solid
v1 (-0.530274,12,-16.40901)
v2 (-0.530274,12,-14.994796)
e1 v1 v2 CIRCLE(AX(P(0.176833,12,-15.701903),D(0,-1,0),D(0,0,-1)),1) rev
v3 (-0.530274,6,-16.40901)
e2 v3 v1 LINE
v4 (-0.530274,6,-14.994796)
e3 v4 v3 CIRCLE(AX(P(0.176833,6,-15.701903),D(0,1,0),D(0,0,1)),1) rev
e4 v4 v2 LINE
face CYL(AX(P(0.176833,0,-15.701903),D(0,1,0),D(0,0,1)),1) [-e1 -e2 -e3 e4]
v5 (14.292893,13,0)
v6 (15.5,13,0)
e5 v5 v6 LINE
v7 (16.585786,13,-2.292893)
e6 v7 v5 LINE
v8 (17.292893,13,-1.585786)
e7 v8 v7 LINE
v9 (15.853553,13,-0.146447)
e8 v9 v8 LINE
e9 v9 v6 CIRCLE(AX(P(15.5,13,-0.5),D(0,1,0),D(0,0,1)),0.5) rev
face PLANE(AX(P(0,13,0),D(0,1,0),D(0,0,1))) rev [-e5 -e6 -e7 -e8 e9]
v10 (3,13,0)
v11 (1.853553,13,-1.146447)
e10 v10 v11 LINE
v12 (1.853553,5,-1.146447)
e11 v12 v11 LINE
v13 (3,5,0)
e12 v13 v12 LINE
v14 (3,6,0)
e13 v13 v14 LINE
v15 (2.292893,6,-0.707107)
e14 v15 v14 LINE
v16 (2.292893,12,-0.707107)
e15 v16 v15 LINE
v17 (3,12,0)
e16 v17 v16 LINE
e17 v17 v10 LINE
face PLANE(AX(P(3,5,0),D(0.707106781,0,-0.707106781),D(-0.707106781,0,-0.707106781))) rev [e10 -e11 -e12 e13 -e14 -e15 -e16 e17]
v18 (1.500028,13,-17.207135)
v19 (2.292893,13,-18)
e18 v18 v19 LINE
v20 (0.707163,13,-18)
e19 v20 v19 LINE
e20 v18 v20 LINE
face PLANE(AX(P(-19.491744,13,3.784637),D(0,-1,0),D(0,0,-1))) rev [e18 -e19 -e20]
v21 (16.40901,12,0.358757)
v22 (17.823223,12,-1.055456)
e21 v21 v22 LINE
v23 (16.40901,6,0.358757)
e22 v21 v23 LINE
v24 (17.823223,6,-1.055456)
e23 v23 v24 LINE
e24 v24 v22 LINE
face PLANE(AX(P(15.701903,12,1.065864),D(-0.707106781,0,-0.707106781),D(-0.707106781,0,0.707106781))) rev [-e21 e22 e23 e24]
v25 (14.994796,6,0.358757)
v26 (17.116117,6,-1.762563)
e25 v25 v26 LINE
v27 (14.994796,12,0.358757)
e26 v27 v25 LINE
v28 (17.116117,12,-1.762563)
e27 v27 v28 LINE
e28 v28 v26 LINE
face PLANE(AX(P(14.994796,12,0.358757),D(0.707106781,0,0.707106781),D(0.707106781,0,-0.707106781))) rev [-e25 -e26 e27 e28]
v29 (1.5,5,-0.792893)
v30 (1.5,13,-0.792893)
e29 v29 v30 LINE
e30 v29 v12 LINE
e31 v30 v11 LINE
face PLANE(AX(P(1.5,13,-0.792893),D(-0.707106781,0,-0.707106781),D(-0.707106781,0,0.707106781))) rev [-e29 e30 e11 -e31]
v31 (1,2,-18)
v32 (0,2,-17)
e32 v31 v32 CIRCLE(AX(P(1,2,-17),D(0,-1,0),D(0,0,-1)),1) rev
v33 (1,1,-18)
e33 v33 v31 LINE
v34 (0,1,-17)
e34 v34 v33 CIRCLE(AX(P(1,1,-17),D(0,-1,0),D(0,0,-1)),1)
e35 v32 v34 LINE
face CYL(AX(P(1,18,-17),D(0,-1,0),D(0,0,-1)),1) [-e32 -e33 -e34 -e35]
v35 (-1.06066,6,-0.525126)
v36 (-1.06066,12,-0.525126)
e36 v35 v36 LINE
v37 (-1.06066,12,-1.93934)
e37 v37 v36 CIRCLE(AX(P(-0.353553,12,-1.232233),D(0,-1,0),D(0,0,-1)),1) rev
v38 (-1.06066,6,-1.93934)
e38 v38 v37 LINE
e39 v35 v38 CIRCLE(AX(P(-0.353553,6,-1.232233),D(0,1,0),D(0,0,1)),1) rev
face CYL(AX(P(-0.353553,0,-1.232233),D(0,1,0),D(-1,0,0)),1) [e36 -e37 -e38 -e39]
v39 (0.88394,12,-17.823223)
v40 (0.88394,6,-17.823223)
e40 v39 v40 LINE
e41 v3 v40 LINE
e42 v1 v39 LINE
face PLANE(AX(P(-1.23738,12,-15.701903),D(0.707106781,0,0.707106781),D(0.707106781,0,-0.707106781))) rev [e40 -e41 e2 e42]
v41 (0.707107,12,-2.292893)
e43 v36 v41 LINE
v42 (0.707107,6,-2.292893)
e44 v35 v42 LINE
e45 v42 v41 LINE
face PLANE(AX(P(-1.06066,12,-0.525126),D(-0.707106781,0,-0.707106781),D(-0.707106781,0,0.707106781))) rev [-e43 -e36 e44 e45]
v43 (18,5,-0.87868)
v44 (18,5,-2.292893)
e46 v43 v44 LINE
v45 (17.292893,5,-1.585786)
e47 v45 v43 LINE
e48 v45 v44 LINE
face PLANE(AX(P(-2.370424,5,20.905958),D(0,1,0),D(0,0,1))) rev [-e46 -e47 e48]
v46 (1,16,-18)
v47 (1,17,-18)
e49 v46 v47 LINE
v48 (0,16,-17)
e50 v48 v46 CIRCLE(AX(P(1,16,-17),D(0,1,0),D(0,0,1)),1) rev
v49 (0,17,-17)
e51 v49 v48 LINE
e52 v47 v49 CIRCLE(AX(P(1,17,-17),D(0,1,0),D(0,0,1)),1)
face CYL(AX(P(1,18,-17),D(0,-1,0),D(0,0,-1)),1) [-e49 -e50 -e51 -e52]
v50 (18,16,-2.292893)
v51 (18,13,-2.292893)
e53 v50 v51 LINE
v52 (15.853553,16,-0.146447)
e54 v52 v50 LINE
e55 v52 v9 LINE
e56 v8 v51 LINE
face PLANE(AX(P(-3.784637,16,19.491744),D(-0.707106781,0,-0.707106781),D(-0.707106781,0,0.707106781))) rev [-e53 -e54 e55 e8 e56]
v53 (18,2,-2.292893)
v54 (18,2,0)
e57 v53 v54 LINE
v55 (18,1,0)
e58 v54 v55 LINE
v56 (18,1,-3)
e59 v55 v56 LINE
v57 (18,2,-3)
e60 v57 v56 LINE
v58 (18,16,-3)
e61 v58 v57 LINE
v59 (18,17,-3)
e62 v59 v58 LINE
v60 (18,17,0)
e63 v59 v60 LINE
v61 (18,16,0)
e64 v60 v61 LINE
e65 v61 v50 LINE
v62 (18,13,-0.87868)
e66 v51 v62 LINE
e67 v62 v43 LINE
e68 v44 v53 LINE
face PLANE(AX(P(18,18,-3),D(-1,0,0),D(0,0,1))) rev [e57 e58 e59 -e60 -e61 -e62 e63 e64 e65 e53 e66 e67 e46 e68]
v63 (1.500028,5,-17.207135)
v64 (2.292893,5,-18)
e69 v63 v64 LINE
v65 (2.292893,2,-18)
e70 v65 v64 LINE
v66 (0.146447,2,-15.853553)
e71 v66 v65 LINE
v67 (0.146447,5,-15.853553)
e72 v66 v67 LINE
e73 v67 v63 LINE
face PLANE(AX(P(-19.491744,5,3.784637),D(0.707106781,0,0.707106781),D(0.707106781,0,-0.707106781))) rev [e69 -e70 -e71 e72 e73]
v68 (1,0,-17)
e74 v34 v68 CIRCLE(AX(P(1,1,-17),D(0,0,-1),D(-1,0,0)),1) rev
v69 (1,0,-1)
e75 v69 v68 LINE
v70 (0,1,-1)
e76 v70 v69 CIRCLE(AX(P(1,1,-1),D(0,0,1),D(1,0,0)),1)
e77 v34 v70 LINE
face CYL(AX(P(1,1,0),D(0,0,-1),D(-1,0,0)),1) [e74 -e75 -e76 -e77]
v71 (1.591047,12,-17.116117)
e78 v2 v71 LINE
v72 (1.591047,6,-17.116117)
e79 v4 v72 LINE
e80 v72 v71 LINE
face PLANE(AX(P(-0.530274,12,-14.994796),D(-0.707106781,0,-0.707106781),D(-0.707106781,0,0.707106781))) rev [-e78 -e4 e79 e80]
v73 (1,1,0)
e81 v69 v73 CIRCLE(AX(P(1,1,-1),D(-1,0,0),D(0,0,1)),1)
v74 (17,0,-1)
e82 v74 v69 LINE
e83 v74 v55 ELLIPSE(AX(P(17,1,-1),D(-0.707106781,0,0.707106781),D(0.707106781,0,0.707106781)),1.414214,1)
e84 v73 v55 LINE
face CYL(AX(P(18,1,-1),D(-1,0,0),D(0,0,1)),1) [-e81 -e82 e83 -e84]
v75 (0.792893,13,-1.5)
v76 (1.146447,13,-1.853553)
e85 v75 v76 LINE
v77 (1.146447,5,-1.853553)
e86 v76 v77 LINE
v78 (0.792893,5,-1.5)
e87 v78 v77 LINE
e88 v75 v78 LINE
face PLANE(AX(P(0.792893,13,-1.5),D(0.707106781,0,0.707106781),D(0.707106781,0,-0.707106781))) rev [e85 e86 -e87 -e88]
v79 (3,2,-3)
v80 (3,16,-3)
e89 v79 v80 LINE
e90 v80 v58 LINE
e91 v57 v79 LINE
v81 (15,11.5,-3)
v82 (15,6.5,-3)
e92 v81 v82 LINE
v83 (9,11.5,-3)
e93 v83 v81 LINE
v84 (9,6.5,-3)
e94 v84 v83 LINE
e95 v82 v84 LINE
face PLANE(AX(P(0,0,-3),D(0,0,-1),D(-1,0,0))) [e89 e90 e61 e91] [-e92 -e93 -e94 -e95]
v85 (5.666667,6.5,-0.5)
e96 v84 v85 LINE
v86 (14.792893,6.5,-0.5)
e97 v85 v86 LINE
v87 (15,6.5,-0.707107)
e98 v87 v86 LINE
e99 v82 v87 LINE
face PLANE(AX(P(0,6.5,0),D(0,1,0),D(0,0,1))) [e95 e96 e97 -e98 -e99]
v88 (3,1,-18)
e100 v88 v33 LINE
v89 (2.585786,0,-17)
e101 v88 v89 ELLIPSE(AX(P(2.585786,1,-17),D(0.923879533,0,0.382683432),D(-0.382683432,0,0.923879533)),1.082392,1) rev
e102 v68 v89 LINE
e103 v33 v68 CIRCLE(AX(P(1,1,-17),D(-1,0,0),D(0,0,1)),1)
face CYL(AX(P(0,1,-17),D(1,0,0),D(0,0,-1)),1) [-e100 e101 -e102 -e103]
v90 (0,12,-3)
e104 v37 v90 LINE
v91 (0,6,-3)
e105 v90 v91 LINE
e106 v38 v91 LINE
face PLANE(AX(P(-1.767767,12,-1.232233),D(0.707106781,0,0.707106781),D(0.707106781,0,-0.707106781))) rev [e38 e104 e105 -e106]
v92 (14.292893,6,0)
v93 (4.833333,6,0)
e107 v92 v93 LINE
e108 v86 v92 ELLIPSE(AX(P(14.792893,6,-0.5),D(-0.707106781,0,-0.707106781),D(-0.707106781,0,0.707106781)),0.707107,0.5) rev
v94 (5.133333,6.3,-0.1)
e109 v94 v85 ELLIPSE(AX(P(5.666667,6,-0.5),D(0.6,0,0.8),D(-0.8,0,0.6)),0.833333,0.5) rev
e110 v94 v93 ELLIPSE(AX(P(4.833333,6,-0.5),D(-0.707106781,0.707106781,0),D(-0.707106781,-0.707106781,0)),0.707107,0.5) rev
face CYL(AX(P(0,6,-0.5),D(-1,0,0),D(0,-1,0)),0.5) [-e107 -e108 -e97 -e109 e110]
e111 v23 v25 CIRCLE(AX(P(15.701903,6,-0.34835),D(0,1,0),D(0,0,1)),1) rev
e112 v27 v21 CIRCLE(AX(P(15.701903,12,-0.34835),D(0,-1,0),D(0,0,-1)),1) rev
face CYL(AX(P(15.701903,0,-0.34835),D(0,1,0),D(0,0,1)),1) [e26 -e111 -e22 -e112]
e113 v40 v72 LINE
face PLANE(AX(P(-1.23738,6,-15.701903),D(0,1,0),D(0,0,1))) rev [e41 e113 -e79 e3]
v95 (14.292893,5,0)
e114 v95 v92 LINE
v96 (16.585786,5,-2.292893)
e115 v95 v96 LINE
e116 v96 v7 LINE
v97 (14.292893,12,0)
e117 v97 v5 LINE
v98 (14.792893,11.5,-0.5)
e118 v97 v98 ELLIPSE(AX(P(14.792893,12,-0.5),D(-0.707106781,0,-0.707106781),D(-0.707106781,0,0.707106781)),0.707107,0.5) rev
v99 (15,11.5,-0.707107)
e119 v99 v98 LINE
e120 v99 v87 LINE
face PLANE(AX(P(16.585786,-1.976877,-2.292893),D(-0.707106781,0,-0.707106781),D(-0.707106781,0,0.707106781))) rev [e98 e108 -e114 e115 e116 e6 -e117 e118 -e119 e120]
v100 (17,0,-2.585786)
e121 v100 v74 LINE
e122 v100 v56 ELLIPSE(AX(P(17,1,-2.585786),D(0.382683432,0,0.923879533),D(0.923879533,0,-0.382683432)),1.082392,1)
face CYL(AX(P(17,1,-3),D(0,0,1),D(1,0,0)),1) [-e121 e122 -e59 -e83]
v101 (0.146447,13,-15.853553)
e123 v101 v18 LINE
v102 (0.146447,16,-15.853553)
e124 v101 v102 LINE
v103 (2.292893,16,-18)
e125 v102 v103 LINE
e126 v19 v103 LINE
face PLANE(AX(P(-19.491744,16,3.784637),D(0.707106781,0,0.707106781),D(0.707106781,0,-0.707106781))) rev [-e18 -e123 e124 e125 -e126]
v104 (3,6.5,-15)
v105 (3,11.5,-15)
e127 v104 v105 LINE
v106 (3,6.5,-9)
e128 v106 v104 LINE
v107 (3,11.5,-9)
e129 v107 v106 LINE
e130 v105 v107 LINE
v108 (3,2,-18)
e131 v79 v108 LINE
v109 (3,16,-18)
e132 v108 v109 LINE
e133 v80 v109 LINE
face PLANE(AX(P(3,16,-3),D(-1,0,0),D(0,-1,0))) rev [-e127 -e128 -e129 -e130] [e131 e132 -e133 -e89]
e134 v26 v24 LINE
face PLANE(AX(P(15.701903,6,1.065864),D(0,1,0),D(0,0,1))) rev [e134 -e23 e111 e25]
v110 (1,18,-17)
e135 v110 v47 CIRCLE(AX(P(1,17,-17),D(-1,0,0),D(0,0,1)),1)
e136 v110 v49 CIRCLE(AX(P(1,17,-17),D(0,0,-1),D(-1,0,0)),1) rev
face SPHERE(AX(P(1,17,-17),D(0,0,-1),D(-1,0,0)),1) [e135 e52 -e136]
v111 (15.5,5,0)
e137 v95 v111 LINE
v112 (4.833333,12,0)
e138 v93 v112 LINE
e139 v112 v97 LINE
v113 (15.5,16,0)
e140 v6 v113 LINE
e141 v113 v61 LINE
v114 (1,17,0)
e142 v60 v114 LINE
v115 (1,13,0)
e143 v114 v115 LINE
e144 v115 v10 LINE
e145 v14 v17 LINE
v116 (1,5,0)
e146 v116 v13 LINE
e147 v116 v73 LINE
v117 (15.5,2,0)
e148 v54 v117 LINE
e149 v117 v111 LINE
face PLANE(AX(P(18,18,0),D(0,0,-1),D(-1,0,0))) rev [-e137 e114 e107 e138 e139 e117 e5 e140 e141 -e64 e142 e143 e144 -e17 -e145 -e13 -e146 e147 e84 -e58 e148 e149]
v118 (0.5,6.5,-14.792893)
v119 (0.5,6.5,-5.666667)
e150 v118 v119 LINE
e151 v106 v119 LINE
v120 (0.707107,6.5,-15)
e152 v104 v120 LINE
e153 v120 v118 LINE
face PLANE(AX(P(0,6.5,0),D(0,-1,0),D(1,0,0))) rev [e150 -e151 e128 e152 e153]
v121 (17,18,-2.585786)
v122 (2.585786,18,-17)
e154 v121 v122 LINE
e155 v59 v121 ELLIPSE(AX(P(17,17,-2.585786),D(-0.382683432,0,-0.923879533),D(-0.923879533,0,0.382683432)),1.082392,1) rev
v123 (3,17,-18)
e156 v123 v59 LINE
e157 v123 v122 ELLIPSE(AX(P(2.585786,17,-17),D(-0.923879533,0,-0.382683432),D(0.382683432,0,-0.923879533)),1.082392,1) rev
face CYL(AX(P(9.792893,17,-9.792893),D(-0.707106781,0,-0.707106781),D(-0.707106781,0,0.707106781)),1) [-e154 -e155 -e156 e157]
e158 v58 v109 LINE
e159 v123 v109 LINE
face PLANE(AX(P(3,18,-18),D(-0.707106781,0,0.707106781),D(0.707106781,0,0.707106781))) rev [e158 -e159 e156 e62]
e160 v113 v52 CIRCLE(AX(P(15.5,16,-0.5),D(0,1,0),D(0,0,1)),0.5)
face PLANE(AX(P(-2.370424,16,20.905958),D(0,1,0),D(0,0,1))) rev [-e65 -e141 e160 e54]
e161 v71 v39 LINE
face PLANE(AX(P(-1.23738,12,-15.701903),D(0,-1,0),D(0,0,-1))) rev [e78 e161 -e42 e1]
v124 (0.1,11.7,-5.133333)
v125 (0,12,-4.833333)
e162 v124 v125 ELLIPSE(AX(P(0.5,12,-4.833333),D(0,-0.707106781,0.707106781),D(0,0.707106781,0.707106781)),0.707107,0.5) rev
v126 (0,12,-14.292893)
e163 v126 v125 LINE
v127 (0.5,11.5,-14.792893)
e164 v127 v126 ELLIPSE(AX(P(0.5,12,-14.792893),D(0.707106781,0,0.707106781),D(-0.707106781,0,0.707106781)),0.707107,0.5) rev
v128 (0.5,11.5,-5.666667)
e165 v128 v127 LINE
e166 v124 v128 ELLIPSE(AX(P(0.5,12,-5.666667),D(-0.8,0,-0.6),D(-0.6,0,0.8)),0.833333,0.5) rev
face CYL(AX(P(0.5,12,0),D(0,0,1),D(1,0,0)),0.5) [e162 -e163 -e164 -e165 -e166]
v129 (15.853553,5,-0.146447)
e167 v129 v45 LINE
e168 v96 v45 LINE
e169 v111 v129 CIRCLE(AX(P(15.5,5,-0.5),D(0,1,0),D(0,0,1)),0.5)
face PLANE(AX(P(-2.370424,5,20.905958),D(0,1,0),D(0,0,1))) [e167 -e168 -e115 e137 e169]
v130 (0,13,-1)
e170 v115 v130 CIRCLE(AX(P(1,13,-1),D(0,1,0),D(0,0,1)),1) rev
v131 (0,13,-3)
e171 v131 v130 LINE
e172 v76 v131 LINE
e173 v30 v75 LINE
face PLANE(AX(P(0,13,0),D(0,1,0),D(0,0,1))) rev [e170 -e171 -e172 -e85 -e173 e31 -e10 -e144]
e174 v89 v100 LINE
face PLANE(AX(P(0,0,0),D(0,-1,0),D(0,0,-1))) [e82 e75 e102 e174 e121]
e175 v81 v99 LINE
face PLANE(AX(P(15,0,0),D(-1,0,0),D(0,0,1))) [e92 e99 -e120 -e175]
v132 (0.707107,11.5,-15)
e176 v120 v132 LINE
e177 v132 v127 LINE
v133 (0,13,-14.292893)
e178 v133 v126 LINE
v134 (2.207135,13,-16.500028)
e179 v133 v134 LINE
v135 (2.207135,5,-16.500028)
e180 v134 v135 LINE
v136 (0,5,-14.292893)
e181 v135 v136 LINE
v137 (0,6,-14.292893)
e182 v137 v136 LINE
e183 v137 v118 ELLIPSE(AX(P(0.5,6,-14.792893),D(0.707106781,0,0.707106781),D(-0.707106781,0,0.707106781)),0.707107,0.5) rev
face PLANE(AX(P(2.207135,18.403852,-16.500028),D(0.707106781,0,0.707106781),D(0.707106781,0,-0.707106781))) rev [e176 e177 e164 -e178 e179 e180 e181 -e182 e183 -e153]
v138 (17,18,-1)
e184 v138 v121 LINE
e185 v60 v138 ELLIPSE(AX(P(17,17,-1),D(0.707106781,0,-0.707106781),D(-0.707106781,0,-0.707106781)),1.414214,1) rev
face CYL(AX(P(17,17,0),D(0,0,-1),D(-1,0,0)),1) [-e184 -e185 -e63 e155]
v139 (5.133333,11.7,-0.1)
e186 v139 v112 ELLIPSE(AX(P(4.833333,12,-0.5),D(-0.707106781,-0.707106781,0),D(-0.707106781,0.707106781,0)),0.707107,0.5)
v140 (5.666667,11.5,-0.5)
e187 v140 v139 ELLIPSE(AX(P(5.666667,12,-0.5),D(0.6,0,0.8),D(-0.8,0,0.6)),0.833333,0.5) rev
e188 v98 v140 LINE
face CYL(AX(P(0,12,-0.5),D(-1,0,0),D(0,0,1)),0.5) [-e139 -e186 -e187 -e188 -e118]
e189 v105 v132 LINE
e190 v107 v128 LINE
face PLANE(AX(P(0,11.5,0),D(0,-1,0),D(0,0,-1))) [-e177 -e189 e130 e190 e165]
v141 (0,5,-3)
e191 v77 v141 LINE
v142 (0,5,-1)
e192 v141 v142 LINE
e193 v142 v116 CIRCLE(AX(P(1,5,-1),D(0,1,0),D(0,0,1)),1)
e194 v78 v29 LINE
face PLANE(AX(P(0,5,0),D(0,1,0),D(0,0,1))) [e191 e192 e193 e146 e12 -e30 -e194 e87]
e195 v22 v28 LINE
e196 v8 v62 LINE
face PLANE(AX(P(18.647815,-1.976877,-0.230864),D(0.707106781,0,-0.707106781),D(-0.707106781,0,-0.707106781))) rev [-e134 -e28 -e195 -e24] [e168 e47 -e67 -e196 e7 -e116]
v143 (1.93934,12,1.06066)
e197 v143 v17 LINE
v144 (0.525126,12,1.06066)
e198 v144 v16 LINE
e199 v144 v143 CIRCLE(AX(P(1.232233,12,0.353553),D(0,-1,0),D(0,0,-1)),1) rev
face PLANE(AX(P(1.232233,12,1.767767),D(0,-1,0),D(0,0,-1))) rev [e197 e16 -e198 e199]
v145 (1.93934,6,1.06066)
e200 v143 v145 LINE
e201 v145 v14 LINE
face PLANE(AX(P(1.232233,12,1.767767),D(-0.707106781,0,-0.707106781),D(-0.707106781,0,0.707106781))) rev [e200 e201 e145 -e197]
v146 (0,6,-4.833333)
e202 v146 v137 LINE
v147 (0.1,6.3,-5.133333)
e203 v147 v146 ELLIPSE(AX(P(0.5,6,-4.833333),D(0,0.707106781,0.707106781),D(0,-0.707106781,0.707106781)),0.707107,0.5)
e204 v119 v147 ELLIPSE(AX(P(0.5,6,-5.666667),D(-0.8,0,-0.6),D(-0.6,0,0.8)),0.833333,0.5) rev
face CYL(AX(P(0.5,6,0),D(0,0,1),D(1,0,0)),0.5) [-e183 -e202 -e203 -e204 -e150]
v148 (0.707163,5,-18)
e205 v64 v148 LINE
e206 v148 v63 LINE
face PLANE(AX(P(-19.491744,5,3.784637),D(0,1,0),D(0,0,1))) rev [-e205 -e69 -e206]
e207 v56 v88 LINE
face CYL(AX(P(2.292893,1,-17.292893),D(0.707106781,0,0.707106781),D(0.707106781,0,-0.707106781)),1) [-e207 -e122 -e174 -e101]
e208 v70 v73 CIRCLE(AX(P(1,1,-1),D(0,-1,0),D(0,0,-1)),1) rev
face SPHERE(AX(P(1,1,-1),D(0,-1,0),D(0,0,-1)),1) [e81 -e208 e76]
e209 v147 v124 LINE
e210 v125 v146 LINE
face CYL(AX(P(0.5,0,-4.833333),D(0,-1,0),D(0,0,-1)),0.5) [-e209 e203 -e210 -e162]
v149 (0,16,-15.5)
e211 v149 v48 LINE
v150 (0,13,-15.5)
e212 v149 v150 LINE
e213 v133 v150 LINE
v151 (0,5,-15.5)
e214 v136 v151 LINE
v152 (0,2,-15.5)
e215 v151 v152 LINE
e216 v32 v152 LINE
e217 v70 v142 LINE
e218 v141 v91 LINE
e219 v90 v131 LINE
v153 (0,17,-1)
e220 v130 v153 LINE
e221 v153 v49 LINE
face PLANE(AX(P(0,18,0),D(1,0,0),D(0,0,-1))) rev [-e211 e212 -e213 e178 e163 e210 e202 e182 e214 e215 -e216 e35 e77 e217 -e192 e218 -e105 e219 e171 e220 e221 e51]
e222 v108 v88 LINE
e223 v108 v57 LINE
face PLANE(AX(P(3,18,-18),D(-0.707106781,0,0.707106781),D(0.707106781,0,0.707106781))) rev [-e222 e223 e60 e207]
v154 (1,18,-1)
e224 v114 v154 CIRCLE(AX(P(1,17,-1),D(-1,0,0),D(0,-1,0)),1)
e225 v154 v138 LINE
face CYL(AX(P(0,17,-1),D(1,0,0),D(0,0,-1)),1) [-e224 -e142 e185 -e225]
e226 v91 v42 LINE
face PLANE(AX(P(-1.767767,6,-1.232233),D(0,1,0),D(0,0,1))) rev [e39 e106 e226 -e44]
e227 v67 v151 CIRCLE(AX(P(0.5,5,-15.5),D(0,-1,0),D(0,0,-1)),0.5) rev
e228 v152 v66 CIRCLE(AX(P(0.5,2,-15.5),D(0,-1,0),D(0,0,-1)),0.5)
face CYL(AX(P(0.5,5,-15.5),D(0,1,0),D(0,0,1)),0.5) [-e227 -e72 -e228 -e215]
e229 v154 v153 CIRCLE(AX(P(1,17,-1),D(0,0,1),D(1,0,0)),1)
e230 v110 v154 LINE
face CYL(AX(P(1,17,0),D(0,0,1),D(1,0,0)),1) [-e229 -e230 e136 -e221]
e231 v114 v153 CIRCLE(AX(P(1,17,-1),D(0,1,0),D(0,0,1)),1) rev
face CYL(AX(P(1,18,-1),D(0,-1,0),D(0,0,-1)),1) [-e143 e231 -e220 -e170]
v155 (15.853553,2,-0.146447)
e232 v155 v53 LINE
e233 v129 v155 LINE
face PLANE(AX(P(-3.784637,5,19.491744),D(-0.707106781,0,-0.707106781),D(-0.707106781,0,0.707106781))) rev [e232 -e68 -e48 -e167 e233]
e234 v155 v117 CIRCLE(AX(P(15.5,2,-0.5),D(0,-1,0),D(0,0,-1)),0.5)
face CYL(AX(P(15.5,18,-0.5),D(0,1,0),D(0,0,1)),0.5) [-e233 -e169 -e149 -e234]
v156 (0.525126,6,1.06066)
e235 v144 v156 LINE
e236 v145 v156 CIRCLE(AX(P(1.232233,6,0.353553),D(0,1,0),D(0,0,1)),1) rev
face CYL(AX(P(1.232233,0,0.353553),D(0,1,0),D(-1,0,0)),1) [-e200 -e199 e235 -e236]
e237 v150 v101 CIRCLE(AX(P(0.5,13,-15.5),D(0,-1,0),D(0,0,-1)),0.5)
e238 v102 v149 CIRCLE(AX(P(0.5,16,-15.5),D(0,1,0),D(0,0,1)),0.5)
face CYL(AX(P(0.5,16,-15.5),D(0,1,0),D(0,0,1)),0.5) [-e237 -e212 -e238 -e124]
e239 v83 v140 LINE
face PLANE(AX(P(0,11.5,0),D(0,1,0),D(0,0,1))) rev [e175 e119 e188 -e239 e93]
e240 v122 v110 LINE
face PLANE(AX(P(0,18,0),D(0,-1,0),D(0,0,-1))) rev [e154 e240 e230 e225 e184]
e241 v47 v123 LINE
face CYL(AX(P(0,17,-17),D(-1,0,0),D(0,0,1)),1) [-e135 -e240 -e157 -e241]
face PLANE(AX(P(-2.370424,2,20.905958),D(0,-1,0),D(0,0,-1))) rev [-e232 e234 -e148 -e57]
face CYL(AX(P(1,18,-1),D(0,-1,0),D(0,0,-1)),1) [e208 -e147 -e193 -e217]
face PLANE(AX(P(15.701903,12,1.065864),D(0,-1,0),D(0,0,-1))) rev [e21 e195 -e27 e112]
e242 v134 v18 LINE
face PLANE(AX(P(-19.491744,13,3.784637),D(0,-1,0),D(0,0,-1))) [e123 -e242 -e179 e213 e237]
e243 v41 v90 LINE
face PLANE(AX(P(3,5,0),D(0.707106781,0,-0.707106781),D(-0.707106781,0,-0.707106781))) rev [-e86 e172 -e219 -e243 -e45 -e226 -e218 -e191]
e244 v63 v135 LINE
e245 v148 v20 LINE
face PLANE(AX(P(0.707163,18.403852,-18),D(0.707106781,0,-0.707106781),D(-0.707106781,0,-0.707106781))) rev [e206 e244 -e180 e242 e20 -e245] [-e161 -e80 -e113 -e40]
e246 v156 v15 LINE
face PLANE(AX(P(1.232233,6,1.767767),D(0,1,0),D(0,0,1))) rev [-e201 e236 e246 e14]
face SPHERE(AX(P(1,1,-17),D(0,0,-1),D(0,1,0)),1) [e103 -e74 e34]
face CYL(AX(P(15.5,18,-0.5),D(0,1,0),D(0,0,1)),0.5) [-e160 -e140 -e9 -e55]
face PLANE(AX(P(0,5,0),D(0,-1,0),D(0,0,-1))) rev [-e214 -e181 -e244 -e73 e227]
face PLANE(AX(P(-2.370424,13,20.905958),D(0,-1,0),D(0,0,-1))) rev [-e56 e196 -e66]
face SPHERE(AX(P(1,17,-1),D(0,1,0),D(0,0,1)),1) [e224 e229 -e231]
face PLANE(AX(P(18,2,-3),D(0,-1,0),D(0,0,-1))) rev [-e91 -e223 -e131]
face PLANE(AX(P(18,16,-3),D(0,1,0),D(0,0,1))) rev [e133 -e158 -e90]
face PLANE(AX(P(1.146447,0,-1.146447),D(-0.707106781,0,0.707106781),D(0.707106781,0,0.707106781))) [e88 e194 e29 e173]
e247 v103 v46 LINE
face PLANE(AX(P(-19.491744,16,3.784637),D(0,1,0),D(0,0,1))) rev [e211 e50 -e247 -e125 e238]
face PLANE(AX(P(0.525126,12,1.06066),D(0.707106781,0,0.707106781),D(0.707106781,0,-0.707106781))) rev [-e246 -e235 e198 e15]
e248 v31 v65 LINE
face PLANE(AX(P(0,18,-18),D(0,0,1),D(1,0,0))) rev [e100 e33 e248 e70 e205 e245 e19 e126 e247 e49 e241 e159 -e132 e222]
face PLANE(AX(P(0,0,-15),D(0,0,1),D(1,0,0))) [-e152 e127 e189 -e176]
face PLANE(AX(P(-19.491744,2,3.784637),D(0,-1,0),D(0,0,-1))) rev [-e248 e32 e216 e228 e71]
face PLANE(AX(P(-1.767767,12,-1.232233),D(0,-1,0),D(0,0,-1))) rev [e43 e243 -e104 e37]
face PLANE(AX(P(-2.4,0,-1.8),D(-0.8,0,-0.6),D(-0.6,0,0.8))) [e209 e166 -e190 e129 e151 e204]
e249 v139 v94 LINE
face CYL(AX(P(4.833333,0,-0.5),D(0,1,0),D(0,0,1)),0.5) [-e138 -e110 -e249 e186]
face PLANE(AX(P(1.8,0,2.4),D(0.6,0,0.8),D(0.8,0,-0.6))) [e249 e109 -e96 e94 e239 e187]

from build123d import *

# Parameters (mm, degrees)
BOSS_EXTRUDE1_DEPTH = 18
SKETCH2_W           = 15
SKETCH2_H           = 14
CUT_EXTRUDE1_DEPTH  = 15
CUT_EXTRUDE2_START  = -3.742641
SKETCH7_W           = 2
SKETCH7_H           = 3
CUT_EXTRUDE2_DEPTH  = 3.242641
CUT_EXTRUDE4_REACH  = 30.583
SKETCH9_W           = 1
SKETCH9_H           = 6
BOSS_EXTRUDE2_DEPTH = 3
CUT_EXTRUDE5_REACH  = 30.583
SKETCH11_W          = 1
SKETCH11_H          = 6
BOSS_EXTRUDE3_DEPTH = 3
CUT_EXTRUDE6_DEPTH  = 4
SKETCH13_W          = 1
SKETCH13_H          = 6
BOSS_EXTRUDE4_DEPTH = 2.5
SKETCH14_W          = 1
SKETCH14_H          = 8
BOSS_EXTRUDE5_DEPTH = 0.5
FILLET3_R           = 1
FILLET4_R           = 0.5


with BuildPart() as part:
    # Sketch1 → Boss-Extrude1 (new body)
    with BuildSketch(Plane(origin=(0, 0, 0), x_dir=(1, 0, 0), z_dir=(0, 1, 0))):
        Polygon((0, 0), (0, 18), (3, 18), (18, 3), (18, 0), align=None)
    extrude(amount=BOSS_EXTRUDE1_DEPTH)

    # Sketch2 → Cut-Extrude1 (cut)
    with BuildSketch(Plane(origin=(0, 0, -18), x_dir=(-1, 0, 0), z_dir=(0, 0, -1))):
        with Locations((-10.5, 9)):
            Rectangle(SKETCH2_W, SKETCH2_H)
    extrude(amount=-CUT_EXTRUDE1_DEPTH, mode=Mode.SUBTRACT)

    # Sketch3 → Cut-Loft1 section 0
    with BuildSketch(Plane(origin=(0, 0, -3), x_dir=(-1, 0, 0), z_dir=(0, 0, -1))):
        with BuildLine():
            Line((-15, 11.5), (-9, 11.5))
            Line((-9, 11.5), (-9, 6.5))
            Line((-9, 6.5), (-15, 6.5))
            Line((-15, 6.5), (-15, 11.5))
        make_face()
    # Sketch6 → Cut-Loft1 section 1
    with BuildSketch(Plane.XY):
        with BuildLine():
            Line((15, 11.5), (5, 11.5))
            Line((5, 11.5), (5, 6.5))
            Line((5, 6.5), (15, 6.5))
            Line((15, 6.5), (15, 11.5))
        make_face()
    loft(mode=Mode.SUBTRACT)

    # Sketch4 → Cut-Loft2 section 0
    with BuildSketch(Plane(origin=(3, 0, 0), x_dir=(0, 0, -1), z_dir=(1, 0, 0))):
        with BuildLine():
            Line((9, 11.5), (15, 11.5))
            Line((15, 11.5), (15, 6.5))
            Line((15, 6.5), (9, 6.5))
            Line((9, 6.5), (9, 11.5))
        make_face()
    # Sketch5 → Cut-Loft2 section 1
    with BuildSketch(Plane.ZY):
        with BuildLine():
            Line((-15, 11.5), (-5, 11.5))
            Line((-5, 11.5), (-5, 6.5))
            Line((-5, 6.5), (-15, 6.5))
            Line((-15, 6.5), (-15, 11.5))
        make_face()
    loft(mode=Mode.SUBTRACT)

    # Sketch7 → Cut-Extrude2 (cut)
    with BuildSketch(Plane(origin=(10.5, 0, -10.5), x_dir=(-0.7071067811865475, 0, -0.7071067811865477), z_dir=(0.7071067811865477, 0, -0.7071067811865475)).offset(CUT_EXTRUDE2_START)):
        with Locations((12.106601718, 14.5)):
            Rectangle(SKETCH7_W, SKETCH7_H)
        with Locations((12.106601718, 3.5)):
            Rectangle(SKETCH7_W, SKETCH7_H)
        with Locations((-12.106601718, 14.5)):
            Rectangle(SKETCH7_W, SKETCH7_H)
        with Locations((-12.106601718, 3.5)):
            Rectangle(SKETCH7_W, SKETCH7_H)
    extrude(amount=CUT_EXTRUDE2_DEPTH, mode=Mode.SUBTRACT)

    # Cut-Extrude4: up to this face of the body (flat: up to its plane)
    cut_extrude4_end = Plane(part.part.faces().sort_by_distance((0.76429774, 13, -17.23570226))[0])
    # Sketch8 → Cut-Extrude4 (cut, up to the picked face)
    with BuildSketch(Plane.XZ.offset(-5), mode=Mode.PRIVATE) as cut_extrude4_sk1:
        Polygon((0.707163247, -18), (2.207135014, -16.500028233), (-0.113993924, -14.178899295), (-1.613965691, -15.678871062), align=None)
    cut_extrude4_tool1 = split(extrude(cut_extrude4_sk1.sketch, amount=-CUT_EXTRUDE4_REACH, mode=Mode.PRIVATE), bisect_by=cut_extrude4_end, keep=Keep.BOTH, mode=Mode.PRIVATE)
    add(cut_extrude4_tool1.solids().sort_by(Axis((0.296585, 5, -16.08945), (0, 1, 0)))[0], mode=Mode.SUBTRACT)


with BuildPart() as cut_extrude4_kept_piece:
    # of the separate pieces the step leaves, the one the design keeps (cut_extrude4_pieces_kept)
    add(part.part.solids().sort_by_distance((0, 0, 0))[0])

    # Sketch9 → Boss-Extrude2 (add)
    with BuildSketch(Plane(origin=(9.353581623, 0, -9.353581623), x_dir=(0.7071067811865475, 0, 0.7071067811865477), z_dir=(-0.7071067811865477, 0, 0.7071067811865475))):
        with Locations((-11.477882134, 9)):
            Rectangle(SKETCH9_W, SKETCH9_H)
    extrude(amount=BOSS_EXTRUDE2_DEPTH)

    # Cut-Extrude5: up to this face of the body (flat: up to its plane)
    cut_extrude5_end = Plane(cut_extrude4_kept_piece.part.faces().sort_by_distance((17.23570226, 5, -0.76429774))[0])
    # Sketch10 → Cut-Extrude5 (cut, up to the picked face)
    with BuildSketch(Plane(origin=(0, 13, 0), x_dir=(1, 0, 0), z_dir=(0, 1, 0)), mode=Mode.PRIVATE) as cut_extrude5_sk1:
        Polygon((18.647815387, 0.23086427), (16.585786438, 2.292893219), (13.714418547, -0.578474672), (15.776447496, -2.640503621), align=None)
    cut_extrude5_tool1 = split(extrude(cut_extrude5_sk1.sketch, amount=-CUT_EXTRUDE5_REACH, mode=Mode.PRIVATE), bisect_by=cut_extrude5_end, keep=Keep.BOTH, mode=Mode.PRIVATE)
    add(cut_extrude5_tool1.solids().sort_by(Axis((16.181117, 13, 0.173805), (0, -1, 0)))[0], mode=Mode.SUBTRACT)

    # Sketch11 → Boss-Extrude3 (add)
    with BuildSketch(Plane(origin=(9.439339828, 0, -9.439339828), x_dir=(0.7071067811865474, 0, 0.7071067811865478), z_dir=(-0.7071067811865478, 0, 0.7071067811865474))):
        with Locations((11.356601718, 9)):
            Rectangle(SKETCH11_W, SKETCH11_H)
    extrude(amount=BOSS_EXTRUDE3_DEPTH)

    # Sketch12 → Cut-Extrude6 (cut, symmetric)
    with BuildSketch(Plane(origin=(0, 9, 0), x_dir=(1, 0, 0), z_dir=(0, 1, 0))):
        Polygon((0, 3), (0, 0), (3, 0), align=None)
    extrude(amount=CUT_EXTRUDE6_DEPTH, both=True, mode=Mode.SUBTRACT)

    # Sketch13 → Boss-Extrude4 (add)
    with BuildSketch(Plane(origin=(1.5, 0, -1.5), x_dir=(0.7071067811865475, 0, 0.7071067811865477), z_dir=(-0.7071067811865477, 0, 0.7071067811865475))):
        with Locations((1.621320344, 9)):
            Rectangle(SKETCH13_W, SKETCH13_H)
        with Locations((-1.621320344, 9)):
            Rectangle(SKETCH13_W, SKETCH13_H)
    extrude(amount=BOSS_EXTRUDE4_DEPTH)

    # Sketch14 → Boss-Extrude5 (add, symmetric)
    with BuildSketch(Plane(origin=(1.5, 0, -1.5), x_dir=(0.7071067811865475, 0, 0.7071067811865477), z_dir=(-0.7071067811865477, 0, 0.7071067811865475))):
        with Locations((0, 9)):
            Rectangle(SKETCH14_W, SKETCH14_H)
    extrude(amount=BOSS_EXTRUDE5_DEPTH, both=True)

    # Fillet3
    fillet3_edges = [cut_extrude4_kept_piece.edges().sort_by_distance(p)[0] for p in [
        (-1.237380402, 9, -15.701902961),
        (-1.767766953, 9, -1.232233047),
        (1.232233047, 9, 1.767766953),
        (15.701902961, 9, 1.065863992),
        (0, 1, -18),
        (0, 17, -18),
        (1.5, 18, -18),
        (1.5, 0, -18),
        (9, 0, 0),
        (18, 0, -1.5),
        (10.5, 0, -10.5),
        (9, 18, 0),
        (18, 18, -1.5),
        (10.5, 18, -10.5),
        (0, 18, -9),
        (0, 0, -9),
        (0, 15.5, 0),
        (0, 2.5, 0),
    ]]
    fillet(fillet3_edges, radius=FILLET3_R - 0.0001)  # a hair under: the kernel refuses the full size

    # Fillet4
    fillet4_edges = [cut_extrude4_kept_piece.edges().sort_by_distance(p)[0] for p in [
        (15.70710656, 14.5, 2.21e-07),
        (15.70710656, 3.5, 2.21e-07),
        (5, 9, 0),
        (9.646446609, 6.5, 0),
        (0, 9, -5),
        (9.646446609, 11.5, 0),
        (0, 6.5, -9.646446609),
        (0, 11.5, -9.646446609),
        (-2.21e-07, 14.5, -15.70710656),
        (-2.21e-07, 3.5, -15.70710656),
    ]]
    fillet(fillet4_edges, radius=FILLET4_R)


solid = cut_extrude4_kept_piece.part
